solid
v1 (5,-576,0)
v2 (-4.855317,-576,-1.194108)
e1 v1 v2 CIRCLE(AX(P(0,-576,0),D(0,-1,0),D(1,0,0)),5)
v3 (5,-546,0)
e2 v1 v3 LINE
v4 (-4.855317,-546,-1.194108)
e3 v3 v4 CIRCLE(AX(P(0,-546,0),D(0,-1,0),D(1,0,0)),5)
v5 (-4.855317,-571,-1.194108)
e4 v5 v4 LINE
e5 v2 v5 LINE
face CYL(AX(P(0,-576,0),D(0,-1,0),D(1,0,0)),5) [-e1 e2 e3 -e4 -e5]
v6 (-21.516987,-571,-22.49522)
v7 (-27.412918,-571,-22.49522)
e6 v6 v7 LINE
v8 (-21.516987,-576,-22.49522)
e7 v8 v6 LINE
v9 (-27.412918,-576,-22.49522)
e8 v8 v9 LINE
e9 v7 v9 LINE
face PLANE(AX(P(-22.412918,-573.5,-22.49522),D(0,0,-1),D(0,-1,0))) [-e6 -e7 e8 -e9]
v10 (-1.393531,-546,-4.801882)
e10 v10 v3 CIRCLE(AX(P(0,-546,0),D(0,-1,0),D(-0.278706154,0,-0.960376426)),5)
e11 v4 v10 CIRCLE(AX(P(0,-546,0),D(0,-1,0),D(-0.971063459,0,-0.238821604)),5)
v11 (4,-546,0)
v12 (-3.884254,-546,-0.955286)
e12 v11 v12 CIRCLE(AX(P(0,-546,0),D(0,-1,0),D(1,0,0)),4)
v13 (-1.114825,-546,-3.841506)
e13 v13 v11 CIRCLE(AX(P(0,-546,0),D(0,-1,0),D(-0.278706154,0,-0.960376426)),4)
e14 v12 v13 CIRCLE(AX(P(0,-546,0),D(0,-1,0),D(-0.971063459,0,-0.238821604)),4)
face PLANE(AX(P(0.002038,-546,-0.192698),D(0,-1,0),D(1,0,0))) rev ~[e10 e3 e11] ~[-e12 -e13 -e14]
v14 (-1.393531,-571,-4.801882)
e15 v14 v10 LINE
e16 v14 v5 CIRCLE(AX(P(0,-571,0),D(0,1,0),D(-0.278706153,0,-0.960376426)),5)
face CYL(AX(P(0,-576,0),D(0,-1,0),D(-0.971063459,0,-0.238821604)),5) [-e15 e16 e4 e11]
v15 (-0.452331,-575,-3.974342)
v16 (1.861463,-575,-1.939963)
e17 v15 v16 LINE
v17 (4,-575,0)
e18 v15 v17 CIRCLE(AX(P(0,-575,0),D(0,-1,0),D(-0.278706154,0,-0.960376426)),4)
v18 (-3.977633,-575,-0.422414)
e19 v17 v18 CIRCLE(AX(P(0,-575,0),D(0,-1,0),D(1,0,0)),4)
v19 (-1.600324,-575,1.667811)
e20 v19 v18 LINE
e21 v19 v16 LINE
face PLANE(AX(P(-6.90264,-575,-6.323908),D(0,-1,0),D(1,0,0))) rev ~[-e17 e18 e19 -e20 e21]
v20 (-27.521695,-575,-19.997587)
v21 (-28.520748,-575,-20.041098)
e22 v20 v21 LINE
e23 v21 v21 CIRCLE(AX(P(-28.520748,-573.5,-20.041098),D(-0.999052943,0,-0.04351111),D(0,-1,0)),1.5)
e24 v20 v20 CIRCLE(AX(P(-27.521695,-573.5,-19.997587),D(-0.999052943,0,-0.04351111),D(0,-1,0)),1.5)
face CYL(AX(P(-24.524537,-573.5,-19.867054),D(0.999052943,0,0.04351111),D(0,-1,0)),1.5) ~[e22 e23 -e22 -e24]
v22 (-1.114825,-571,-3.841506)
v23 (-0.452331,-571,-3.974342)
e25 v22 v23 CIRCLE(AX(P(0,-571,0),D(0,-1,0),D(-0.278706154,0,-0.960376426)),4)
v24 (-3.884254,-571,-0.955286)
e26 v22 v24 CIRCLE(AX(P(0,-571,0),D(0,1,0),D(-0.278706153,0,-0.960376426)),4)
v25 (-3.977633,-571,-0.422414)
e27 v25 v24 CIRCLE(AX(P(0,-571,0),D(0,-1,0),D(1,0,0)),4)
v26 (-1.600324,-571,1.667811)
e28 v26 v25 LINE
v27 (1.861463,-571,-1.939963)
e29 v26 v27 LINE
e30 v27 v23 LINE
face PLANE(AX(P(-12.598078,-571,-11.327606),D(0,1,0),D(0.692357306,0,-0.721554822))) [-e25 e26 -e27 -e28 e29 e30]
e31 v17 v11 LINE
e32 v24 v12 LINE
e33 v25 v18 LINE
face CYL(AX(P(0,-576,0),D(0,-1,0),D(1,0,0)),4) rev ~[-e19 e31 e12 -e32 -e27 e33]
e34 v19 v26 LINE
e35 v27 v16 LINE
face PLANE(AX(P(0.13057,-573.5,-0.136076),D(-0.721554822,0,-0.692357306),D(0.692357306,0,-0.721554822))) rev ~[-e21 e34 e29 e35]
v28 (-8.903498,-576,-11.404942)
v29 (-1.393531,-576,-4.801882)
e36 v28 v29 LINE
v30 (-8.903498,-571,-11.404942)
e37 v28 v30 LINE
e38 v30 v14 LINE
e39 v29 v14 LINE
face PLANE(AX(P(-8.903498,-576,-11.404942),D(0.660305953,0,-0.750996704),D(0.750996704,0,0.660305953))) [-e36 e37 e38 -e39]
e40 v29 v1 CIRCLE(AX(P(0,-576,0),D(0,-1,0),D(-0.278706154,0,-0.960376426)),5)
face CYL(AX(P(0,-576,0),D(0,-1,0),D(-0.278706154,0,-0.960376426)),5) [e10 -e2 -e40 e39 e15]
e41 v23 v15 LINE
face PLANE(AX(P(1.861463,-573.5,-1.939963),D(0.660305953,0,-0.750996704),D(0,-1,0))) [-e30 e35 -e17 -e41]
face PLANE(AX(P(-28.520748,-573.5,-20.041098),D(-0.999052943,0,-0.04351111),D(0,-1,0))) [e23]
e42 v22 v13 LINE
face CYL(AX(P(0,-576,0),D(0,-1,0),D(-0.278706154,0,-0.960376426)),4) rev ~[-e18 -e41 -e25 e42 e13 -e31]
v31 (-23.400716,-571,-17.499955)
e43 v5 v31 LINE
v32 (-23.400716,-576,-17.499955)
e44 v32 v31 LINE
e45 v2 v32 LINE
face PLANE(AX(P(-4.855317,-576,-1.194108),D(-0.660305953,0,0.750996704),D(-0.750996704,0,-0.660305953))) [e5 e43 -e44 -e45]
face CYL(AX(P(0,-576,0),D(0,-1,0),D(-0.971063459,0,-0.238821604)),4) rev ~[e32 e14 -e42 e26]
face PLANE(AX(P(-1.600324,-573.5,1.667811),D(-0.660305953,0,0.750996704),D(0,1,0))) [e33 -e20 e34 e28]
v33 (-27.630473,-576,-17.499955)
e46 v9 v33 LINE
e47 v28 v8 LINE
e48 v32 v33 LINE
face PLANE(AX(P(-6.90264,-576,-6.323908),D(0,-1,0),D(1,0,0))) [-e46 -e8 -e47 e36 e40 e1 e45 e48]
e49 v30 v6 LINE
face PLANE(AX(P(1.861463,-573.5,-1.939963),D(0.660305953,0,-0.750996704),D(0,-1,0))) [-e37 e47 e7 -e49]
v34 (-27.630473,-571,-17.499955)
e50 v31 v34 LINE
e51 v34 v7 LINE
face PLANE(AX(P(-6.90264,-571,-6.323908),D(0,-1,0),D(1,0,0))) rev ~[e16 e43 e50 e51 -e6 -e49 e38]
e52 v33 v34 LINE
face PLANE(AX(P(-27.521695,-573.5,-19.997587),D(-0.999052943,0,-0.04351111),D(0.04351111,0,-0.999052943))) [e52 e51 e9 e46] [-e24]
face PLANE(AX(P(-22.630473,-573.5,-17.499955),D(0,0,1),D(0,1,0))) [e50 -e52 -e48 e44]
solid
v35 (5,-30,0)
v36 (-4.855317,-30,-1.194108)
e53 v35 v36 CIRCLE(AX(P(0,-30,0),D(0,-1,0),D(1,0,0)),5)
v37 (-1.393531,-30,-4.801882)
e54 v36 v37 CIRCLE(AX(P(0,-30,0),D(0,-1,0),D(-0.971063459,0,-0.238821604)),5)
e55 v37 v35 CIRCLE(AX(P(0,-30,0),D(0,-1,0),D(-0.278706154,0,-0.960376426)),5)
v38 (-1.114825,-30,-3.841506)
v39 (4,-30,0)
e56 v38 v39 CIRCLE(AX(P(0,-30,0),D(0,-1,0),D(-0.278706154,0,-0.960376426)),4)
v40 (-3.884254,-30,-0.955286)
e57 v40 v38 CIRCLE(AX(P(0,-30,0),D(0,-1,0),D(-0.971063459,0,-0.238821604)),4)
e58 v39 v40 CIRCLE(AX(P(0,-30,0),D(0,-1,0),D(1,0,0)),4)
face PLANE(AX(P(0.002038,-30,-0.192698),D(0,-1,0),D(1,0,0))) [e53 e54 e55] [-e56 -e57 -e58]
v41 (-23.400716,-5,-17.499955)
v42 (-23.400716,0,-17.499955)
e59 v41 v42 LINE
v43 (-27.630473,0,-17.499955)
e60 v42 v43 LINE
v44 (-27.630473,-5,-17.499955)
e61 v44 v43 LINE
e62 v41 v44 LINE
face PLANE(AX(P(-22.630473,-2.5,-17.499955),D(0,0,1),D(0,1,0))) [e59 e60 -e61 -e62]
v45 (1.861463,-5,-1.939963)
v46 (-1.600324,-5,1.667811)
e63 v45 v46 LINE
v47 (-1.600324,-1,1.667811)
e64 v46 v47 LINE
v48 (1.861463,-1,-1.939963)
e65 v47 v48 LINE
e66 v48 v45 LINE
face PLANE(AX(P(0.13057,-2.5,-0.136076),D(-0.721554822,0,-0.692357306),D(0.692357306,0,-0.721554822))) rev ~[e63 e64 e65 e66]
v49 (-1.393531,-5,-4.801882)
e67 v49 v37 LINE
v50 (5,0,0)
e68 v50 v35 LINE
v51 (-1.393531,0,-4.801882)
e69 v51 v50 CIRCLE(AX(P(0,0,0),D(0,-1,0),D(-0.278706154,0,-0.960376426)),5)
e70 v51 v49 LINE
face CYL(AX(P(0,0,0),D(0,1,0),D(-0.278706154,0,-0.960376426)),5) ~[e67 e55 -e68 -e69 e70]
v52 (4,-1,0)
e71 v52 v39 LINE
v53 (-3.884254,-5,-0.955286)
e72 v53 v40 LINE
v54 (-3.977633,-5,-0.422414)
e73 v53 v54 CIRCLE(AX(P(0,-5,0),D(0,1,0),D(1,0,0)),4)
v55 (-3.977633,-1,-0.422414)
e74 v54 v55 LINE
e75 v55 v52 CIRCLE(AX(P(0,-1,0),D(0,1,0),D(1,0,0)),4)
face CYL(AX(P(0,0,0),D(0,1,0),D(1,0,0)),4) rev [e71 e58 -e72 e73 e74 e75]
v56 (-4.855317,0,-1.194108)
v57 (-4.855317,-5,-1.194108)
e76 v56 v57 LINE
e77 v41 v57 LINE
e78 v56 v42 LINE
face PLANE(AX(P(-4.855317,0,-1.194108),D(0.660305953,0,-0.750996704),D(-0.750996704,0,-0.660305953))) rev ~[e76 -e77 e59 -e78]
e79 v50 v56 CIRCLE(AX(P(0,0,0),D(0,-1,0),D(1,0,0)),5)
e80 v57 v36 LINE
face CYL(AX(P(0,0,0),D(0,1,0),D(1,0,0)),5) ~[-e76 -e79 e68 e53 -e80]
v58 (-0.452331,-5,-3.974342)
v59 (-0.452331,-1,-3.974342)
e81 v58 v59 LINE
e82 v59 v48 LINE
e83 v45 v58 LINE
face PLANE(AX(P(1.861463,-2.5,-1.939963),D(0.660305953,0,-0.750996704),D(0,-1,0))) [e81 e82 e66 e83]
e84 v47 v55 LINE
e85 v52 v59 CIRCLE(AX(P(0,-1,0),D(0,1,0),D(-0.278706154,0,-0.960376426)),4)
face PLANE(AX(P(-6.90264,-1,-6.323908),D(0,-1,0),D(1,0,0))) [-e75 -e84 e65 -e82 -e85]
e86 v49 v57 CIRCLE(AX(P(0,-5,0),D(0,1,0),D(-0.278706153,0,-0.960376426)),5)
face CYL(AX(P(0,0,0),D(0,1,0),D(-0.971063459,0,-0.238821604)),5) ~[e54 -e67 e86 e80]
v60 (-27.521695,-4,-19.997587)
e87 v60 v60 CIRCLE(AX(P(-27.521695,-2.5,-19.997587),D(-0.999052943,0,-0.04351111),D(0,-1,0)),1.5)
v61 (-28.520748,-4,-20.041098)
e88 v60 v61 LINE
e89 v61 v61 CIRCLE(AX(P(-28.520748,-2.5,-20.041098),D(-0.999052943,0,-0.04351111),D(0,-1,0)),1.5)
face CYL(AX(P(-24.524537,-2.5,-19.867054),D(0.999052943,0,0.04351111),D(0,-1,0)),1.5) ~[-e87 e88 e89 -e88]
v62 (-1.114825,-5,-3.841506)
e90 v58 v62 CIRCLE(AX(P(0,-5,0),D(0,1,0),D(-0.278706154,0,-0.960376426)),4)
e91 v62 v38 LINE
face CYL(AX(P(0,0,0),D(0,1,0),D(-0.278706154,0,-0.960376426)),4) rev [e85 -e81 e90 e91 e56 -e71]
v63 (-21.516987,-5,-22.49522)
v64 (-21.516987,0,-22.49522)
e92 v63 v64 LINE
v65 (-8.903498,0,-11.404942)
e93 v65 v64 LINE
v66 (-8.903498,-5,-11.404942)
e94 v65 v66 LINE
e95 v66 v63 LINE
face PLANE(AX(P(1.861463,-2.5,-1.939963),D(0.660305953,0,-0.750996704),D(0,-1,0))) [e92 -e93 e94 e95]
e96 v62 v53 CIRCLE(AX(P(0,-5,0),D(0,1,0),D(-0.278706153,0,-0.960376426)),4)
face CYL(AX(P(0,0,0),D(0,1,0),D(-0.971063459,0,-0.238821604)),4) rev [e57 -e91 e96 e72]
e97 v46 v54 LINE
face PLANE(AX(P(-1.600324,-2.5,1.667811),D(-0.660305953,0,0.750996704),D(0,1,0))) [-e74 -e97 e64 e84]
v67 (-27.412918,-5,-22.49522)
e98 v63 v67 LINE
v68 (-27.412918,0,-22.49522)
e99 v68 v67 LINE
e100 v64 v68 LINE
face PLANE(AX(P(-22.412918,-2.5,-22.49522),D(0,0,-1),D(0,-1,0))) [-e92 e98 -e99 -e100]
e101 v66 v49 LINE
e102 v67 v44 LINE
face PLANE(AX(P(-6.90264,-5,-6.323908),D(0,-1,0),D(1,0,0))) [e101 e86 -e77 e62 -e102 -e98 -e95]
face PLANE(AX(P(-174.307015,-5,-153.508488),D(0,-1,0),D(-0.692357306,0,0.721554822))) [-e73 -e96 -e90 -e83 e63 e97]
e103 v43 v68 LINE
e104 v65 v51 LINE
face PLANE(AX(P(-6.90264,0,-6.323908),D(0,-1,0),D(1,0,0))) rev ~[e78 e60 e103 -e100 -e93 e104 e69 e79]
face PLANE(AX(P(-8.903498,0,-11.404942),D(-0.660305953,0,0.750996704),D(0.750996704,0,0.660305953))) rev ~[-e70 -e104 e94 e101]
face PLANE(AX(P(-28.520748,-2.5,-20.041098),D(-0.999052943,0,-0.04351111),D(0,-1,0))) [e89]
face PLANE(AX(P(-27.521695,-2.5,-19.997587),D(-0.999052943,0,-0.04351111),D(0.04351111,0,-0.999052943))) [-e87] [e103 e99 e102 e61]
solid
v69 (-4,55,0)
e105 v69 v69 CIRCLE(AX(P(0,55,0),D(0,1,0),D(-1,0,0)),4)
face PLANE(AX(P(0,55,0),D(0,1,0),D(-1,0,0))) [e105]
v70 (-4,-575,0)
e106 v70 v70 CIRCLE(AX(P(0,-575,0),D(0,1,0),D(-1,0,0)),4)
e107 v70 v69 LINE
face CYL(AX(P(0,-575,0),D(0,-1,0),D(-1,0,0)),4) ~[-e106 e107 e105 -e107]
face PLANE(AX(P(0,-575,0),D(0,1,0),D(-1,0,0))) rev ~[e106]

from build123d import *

# Parameters (mm, degrees)
F2_DEPTH  = 30
F3_DEPTH  = 5
F5_DEPTH  = 30
F6_DEPTH  = 5
F7_T      = -1
F8_T      = -1
F9_R      = 4
F10_DEPTH = 630
F6_FACE_W = 5
F6_FACE_H = 5
F3_FACE_W = 5
F3_FACE_H = 5
F14_R     = 1.5
F15_DEPTH = 3
F16_R     = 1.5
F17_DEPTH = 3
F18_DEPTH = 4
F19_DEPTH = 4


with BuildPart() as f2:
    # F1 (on Front) → F2 (new body)
    with BuildSketch(Plane.XZ):
        with BuildLine():
            ThreePointArc((-1.3935307675, -4.801882131), (3.0026943037, -3.9979778537), (5, 0))
            ThreePointArc((5, 0), (-0.6014206199, 4.9636975369), (-4.8553172952, -1.1941080199))
            ThreePointArc((-4.8553172952, -1.1941080199), (-3.6077741111, -3.4617865277), (-1.3935307675, -4.801882131))
        make_face()
    extrude(amount=F2_DEPTH)

    # F1 (on Front) → F3 (join)
    with BuildSketch(Plane.XZ):
        with BuildLine():
            ThreePointArc((-1.3935307675, -4.801882131), (-3.6077741111, -3.4617865277), (-4.8553172952, -1.1941080199))
            Line((-4.8553172952, -1.1941080199), (-12.3652843317, -7.7971675463))
            Line((-12.3652843317, -7.7971675463), (-8.903497804, -11.4049416575))
            Line((-8.903497804, -11.4049416575), (-1.3935307675, -4.801882131))
        make_face()
    extrude(amount=F3_DEPTH)

    # F8
    f8_openings = [f2.faces().sort_by_distance(p)[0] for p in [
        (0, -30, 0),
    ]]
    offset(amount=F8_T, openings=f8_openings)

    # F13: sweep along a path in F11
    with BuildLine(Plane.XZ.offset(576)) as f13_path:
        Line((0, 0), (-22.5299011097, -19.8091785794))
        Line((-22.5299011097, -19.8091785794), (-27.5299011097, -19.8091785794))
    # F3_face (on face) → F13 (sweep)
    with BuildSketch(Plane(origin=(-10.6343910679, -2.5, -9.6010546019), x_dir=(0, -1, 0), z_dir=(-0.7215548222, 0, -0.6923573055))):
        Rectangle(F3_FACE_W, F3_FACE_H)
    sweep(path=f13_path.line, transition=Transition.RIGHT)

    # F16 (on face) → F17 (cut)
    with BuildSketch(Plane(origin=(-28.3388841018, 0, -1.234225183), x_dir=(0, -1, 0), z_dir=(-0.9990529432, 0, -0.0435111099))):
        with Locations((2.5, -18.7811488439)):
            Circle(F16_R)
    extrude(amount=-F17_DEPTH, mode=Mode.SUBTRACT)

    # F18 (add): a face of the model
    f18_faces = [f2.faces().sort_by_distance(p)[0] for p in [
        (-24.5245366401, -2.5, -19.8670538823),
    ]]
    extrude(f18_faces, amount=F18_DEPTH)


with BuildPart() as f5:
    # F4 (on offset) → F5 (new body)
    with BuildSketch(Plane.XZ.offset(576)):
        with BuildLine():
            ThreePointArc((-1.3935307675, -4.801882131), (3.0026943037, -3.9979778537), (5, 0))
            ThreePointArc((5, 0), (-0.6014206199, 4.9636975369), (-4.8553172952, -1.1941080199))
            ThreePointArc((-4.8553172952, -1.1941080199), (-3.6077741111, -3.4617865277), (-1.3935307675, -4.801882131))
        make_face()
    extrude(amount=-F5_DEPTH)

    # F4 (on offset) → F6 (join)
    with BuildSketch(Plane.XZ.offset(576)):
        with BuildLine():
            ThreePointArc((-1.3935307675, -4.801882131), (-3.6077741111, -3.4617865277), (-4.8553172952, -1.1941080199))
            Line((-4.8553172952, -1.1941080199), (-12.3652843317, -7.7971675463))
            Line((-12.3652843317, -7.7971675463), (-8.903497804, -11.4049416575))
            Line((-8.903497804, -11.4049416575), (-1.3935307675, -4.801882131))
        make_face()
    extrude(amount=-F6_DEPTH)

    # F7
    f7_openings = [f5.faces().sort_by_distance(p)[0] for p in [
        (0, -546, 0),
    ]]
    offset(amount=F7_T, openings=f7_openings)

    # F12: sweep along a path in F11
    with BuildLine(Plane.XZ.offset(576)) as f12_path:
        Line((0, 0), (-22.5299011097, -19.8091785794))
        Line((-22.5299011097, -19.8091785794), (-27.5299011097, -19.8091785794))
    # F6_face (on face) → F12 (sweep)
    with BuildSketch(Plane(origin=(-10.6343910679, -573.5, -9.6010546019), x_dir=(0, -1, 0), z_dir=(-0.7215548222, 0, -0.6923573055))):
        Rectangle(F6_FACE_W, F6_FACE_H)
    sweep(path=f12_path.line, transition=Transition.RIGHT)

    # F14 (on face) → F15 (cut)
    with BuildSketch(Plane(origin=(-28.3388841018, 0, -1.234225183), x_dir=(0, -1, 0), z_dir=(-0.9990529432, 0, -0.0435111099))):
        with Locations((573.5, -18.7811488439)):
            Circle(F14_R)
    extrude(amount=-F15_DEPTH, mode=Mode.SUBTRACT)

    # F19 (add): a face of the model
    f19_faces = [f5.faces().sort_by_distance(p)[0] for p in [
        (-24.5245366401, -573.5, -19.8670538823),
    ]]
    extrude(f19_faces, amount=F19_DEPTH)


with BuildPart() as f10:
    # F9 (on face) → F10 (new body)
    with BuildSketch(Plane(origin=(0, -575, 0), x_dir=(-1, 0, 0), z_dir=(0, 1, 0))):
        Circle(F9_R)
    extrude(amount=F10_DEPTH)


solid = Compound([f2.part, f5.part, f10.part])
